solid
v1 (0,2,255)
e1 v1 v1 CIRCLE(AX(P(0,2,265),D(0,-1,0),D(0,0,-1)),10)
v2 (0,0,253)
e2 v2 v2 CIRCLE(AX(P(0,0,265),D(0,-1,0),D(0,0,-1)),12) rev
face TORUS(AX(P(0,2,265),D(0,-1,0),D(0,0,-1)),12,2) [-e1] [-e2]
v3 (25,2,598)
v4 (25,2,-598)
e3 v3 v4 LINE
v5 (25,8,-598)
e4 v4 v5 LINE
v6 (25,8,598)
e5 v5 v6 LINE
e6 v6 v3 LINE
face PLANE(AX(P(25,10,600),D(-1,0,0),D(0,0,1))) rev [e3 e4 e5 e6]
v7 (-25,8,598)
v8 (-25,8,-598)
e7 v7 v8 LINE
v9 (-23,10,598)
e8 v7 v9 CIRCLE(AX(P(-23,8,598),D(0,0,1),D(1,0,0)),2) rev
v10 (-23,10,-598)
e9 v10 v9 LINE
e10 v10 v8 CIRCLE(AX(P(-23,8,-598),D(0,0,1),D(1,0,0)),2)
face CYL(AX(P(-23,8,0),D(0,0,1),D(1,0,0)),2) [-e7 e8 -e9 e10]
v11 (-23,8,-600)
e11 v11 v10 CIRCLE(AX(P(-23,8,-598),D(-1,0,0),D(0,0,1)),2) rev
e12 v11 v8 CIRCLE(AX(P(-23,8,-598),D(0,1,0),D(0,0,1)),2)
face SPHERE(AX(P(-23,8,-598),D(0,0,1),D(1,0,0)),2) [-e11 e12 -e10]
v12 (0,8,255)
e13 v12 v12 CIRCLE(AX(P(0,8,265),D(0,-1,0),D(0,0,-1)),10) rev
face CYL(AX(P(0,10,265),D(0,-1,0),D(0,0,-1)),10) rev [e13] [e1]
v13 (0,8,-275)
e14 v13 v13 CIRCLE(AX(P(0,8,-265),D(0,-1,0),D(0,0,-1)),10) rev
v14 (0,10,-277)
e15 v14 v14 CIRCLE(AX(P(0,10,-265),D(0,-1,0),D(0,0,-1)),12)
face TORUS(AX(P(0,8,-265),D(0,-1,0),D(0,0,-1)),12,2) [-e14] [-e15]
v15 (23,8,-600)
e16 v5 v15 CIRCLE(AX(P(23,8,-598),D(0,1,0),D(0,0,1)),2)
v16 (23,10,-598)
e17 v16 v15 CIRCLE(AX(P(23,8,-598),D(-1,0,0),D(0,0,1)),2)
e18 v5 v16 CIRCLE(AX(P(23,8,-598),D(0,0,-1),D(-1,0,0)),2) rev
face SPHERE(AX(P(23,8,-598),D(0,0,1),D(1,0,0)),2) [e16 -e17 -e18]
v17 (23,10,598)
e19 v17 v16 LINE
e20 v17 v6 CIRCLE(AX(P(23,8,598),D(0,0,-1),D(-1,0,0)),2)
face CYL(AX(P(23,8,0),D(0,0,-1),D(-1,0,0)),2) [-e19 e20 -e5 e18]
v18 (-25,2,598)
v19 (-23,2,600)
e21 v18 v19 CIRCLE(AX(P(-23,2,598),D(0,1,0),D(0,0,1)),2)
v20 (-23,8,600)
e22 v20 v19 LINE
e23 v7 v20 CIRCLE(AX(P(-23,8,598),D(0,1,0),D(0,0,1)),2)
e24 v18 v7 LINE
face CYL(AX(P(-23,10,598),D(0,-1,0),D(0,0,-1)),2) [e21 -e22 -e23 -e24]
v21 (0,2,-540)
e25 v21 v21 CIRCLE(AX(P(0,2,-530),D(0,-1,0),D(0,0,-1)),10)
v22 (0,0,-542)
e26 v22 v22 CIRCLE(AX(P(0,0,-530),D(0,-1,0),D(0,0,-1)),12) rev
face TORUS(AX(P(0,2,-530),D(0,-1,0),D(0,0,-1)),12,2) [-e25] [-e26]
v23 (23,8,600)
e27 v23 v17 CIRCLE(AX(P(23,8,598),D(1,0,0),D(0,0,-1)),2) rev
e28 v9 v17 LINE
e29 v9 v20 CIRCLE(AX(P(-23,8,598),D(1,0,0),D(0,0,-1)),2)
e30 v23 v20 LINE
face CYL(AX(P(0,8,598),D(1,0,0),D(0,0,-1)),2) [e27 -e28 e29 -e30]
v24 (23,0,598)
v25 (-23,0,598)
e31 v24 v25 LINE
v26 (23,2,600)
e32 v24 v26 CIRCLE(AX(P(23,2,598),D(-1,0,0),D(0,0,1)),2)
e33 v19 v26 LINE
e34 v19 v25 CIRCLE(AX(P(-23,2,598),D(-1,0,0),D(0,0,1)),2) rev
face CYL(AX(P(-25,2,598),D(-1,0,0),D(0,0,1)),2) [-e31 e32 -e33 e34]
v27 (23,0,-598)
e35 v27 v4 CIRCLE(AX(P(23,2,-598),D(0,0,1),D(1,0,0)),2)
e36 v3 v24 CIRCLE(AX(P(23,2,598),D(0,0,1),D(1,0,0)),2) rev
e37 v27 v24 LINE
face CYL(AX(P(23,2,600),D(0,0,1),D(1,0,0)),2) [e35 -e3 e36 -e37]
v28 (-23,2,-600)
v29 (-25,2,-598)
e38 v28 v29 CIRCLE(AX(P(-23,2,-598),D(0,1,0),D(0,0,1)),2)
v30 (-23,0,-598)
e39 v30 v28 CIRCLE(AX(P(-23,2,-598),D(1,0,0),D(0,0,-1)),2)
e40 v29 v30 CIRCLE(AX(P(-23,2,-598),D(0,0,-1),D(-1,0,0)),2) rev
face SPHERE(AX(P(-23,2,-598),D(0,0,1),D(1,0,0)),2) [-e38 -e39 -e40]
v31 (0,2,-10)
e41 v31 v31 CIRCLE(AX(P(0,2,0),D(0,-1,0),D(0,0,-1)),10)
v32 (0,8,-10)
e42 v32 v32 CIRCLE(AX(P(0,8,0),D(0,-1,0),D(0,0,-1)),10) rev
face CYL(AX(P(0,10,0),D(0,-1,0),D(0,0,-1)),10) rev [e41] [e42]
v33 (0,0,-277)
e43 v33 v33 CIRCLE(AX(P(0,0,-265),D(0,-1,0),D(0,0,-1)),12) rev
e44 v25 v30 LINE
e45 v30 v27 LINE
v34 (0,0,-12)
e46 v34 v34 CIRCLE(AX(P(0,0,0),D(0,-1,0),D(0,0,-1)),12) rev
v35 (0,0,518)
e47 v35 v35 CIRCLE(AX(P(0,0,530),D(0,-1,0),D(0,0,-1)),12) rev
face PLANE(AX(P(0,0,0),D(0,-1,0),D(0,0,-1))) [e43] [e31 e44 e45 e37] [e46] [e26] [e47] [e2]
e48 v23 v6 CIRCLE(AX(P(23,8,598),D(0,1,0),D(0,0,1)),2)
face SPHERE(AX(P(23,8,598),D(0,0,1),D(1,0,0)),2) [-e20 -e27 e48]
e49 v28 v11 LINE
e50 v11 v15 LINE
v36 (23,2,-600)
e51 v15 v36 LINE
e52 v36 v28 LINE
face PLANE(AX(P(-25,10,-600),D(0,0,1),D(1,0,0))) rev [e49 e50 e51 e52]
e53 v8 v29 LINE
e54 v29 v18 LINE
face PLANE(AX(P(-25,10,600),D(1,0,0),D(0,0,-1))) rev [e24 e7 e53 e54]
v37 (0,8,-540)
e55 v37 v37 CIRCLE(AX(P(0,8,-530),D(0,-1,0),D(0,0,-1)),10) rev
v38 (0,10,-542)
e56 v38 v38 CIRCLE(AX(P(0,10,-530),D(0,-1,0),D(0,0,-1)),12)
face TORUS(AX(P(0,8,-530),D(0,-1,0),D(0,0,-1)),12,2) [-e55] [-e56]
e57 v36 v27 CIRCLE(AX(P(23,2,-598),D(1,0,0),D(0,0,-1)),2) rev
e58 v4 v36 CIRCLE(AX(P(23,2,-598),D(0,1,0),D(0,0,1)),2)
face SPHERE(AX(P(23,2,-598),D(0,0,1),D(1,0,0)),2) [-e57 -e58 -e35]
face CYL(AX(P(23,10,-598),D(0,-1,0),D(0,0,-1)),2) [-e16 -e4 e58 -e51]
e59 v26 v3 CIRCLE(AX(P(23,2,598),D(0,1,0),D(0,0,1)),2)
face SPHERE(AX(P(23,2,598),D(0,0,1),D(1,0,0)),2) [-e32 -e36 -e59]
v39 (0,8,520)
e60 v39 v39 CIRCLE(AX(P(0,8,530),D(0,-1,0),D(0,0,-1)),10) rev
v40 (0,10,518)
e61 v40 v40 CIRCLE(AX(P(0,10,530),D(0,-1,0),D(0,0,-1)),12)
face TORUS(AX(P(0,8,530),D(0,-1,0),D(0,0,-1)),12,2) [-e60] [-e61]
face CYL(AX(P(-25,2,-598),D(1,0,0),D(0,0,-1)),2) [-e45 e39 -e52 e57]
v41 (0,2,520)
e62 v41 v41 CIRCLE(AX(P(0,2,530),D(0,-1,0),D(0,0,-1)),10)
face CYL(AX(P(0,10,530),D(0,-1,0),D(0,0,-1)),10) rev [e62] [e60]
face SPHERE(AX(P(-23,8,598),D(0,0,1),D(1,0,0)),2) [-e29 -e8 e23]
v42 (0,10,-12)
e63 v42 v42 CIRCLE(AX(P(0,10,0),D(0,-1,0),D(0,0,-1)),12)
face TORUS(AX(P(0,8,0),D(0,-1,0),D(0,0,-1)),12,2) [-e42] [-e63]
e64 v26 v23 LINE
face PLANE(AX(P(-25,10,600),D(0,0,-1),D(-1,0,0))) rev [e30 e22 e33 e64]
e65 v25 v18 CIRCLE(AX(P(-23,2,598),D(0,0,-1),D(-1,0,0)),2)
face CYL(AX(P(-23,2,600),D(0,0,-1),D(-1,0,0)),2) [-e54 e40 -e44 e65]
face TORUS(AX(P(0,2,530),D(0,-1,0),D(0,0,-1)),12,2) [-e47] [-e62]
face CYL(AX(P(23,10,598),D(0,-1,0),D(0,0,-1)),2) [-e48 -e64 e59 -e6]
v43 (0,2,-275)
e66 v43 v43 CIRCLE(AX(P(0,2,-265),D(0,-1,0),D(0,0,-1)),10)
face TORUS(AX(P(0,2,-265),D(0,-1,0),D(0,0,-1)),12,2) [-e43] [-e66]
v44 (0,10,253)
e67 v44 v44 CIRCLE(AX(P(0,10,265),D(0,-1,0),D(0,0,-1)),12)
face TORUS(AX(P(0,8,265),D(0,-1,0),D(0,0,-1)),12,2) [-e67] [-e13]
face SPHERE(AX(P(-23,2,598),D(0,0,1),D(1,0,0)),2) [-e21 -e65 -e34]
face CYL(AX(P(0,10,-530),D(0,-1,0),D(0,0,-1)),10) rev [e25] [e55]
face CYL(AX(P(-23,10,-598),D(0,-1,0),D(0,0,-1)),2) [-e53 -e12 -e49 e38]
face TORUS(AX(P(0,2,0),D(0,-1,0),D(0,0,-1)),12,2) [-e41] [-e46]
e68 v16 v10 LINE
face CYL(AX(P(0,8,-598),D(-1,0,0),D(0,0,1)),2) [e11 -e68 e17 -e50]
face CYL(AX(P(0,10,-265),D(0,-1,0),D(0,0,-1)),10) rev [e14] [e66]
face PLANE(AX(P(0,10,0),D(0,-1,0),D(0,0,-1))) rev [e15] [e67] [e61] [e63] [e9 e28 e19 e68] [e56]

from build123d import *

# Parameters (mm, degrees)
CROQUIS1_W              = 50
CROQUIS1_H              = 1200
CROQUIS1_R              = 10
SALIENTE_EXTRUIR1_DEPTH = 10
REDONDEO1_R             = 2
REDONDEO2_R             = 2


with BuildPart() as part:
    # Croquis1 → Saliente-Extruir1 (new body)
    with BuildSketch(Plane(origin=(0, 0, 0), x_dir=(1, 0, 0), z_dir=(0, 1, 0))):
        Rectangle(CROQUIS1_W, CROQUIS1_H)
        with Locations(Location((0, 0, 0), (0, 0, 270))):
            Circle(CROQUIS1_R, mode=Mode.SUBTRACT)
        with Locations(Location((0, 265, 0), (0, 0, 270))):
            Circle(CROQUIS1_R, mode=Mode.SUBTRACT)
        with Locations(Location((0, 530, 0), (0, 0, 270))):
            Circle(CROQUIS1_R, mode=Mode.SUBTRACT)
        with Locations(Location((0, -530, 0), (0, 0, 270))):
            Circle(CROQUIS1_R, mode=Mode.SUBTRACT)
        with Locations(Location((0, -265, 0), (0, 0, 270))):
            Circle(CROQUIS1_R, mode=Mode.SUBTRACT)
    extrude(amount=SALIENTE_EXTRUIR1_DEPTH)

    # Redondeo1
    redondeo1_edges = [part.edges().sort_by_distance(p)[0] for p in [
        (0, 0, -275),
        (0, 10, -275),
        (-25, 10, 0),
        (0, 0, -10),
        (0, 10, -10),
        (0, 10, 600),
        (0, 0, -540),
        (0, 10, -540),
        (0, 0, 255),
        (0, 10, 255),
        (0, 0, 520),
        (0, 10, 520),
        (25, 10, 0),
        (0, 0, 600),
        (-25, 0, 0),
        (0, 0, -600),
        (25, 0, 0),
        (0, 10, -600),
    ]]
    fillet(redondeo1_edges, radius=REDONDEO1_R)

    # Redondeo2
    # the kernel refuses this fillet: 2 mm, written as the material it takes off along each edge
    with BuildSketch(Plane(origin=(-23, 8, -598), x_dir=(0, 0, -1), z_dir=(-1, 0, 0))) as redondeo2_piece_1_section:
        Polygon((0, 0), (REDONDEO2_R, 0), (REDONDEO2_R, -REDONDEO2_R), (0, -REDONDEO2_R), align=None)
    redondeo2_piece_1 = extrude(amount=REDONDEO2_R, mode=Mode.PRIVATE)
    redondeo2_piece_1 = redondeo2_piece_1 - Plane(origin=(-23, 8, -598), x_dir=(0, -0.7071067811865475, 0.7071067811865475), z_dir=(-1, 0, 0)) * Sphere(REDONDEO2_R, mode=Mode.PRIVATE)
    add(redondeo2_piece_1, mode=Mode.SUBTRACT)
    with BuildSketch(Plane(origin=(23, 8, -598), x_dir=(0, 0, -1), z_dir=(1, 0, 0))) as redondeo2_piece_2_section:
        Polygon((0, 0), (REDONDEO2_R, 0), (REDONDEO2_R, REDONDEO2_R), (0, REDONDEO2_R), align=None)
    redondeo2_piece_2 = extrude(amount=REDONDEO2_R, mode=Mode.PRIVATE)
    redondeo2_piece_2 = redondeo2_piece_2 - Plane(origin=(23, 8, -598), x_dir=(0, -0.7071067811865475, 0.7071067811865475), z_dir=(1, 0, 0)) * Sphere(REDONDEO2_R, mode=Mode.PRIVATE)
    add(redondeo2_piece_2, mode=Mode.SUBTRACT)
    with BuildSketch(Plane(origin=(-23, 8, 598), x_dir=(-1, 0, 0), z_dir=(0, 0, 1))) as redondeo2_piece_3_section:
        Polygon((0, 0), (REDONDEO2_R, 0), (REDONDEO2_R, -REDONDEO2_R), (0, -REDONDEO2_R), align=None)
    redondeo2_piece_3 = extrude(amount=REDONDEO2_R, mode=Mode.PRIVATE)
    redondeo2_piece_3 = redondeo2_piece_3 - Plane(origin=(-23, 8, 598), x_dir=(0.7071067811865475, -0.7071067811865475, 0), z_dir=(0, 0, 1)) * Sphere(REDONDEO2_R, mode=Mode.PRIVATE)
    add(redondeo2_piece_3, mode=Mode.SUBTRACT)
    with BuildSketch(Plane(origin=(23, 8, 598), x_dir=(1, 0, 0), z_dir=(0, 0, 1))) as redondeo2_piece_4_section:
        Polygon((0, 0), (REDONDEO2_R, 0), (REDONDEO2_R, REDONDEO2_R), (0, REDONDEO2_R), align=None)
    redondeo2_piece_4 = extrude(amount=REDONDEO2_R, mode=Mode.PRIVATE)
    redondeo2_piece_4 = redondeo2_piece_4 - Plane(origin=(23, 8, 598), x_dir=(-0.7071067811865475, -0.7071067811865475, 0), z_dir=(0, 0, 1)) * Sphere(REDONDEO2_R, mode=Mode.PRIVATE)
    add(redondeo2_piece_4, mode=Mode.SUBTRACT)
    with BuildSketch(Plane(origin=(23, 2, 598), x_dir=(1, 0, 0), z_dir=(0, 0, 1))) as redondeo2_piece_5_section:
        Polygon((0, 0), (REDONDEO2_R, 0), (REDONDEO2_R, -REDONDEO2_R), (0, -REDONDEO2_R), align=None)
    redondeo2_piece_5 = extrude(amount=REDONDEO2_R, mode=Mode.PRIVATE)
    redondeo2_piece_5 = redondeo2_piece_5 - Plane(origin=(23, 2, 598), x_dir=(-0.7071067811865475, 0.7071067811865475, 0), z_dir=(0, 0, 1)) * Sphere(REDONDEO2_R, mode=Mode.PRIVATE)
    add(redondeo2_piece_5, mode=Mode.SUBTRACT)
    with BuildSketch(Plane(origin=(-23, 2, 598), x_dir=(-1, 0, 0), z_dir=(0, 0, 1))) as redondeo2_piece_6_section:
        Polygon((0, 0), (REDONDEO2_R, 0), (REDONDEO2_R, REDONDEO2_R), (0, REDONDEO2_R), align=None)
    redondeo2_piece_6 = extrude(amount=REDONDEO2_R, mode=Mode.PRIVATE)
    redondeo2_piece_6 = redondeo2_piece_6 - Plane(origin=(-23, 2, 598), x_dir=(0.7071067811865475, 0.7071067811865475, 0), z_dir=(0, 0, 1)) * Sphere(REDONDEO2_R, mode=Mode.PRIVATE)
    add(redondeo2_piece_6, mode=Mode.SUBTRACT)
    with BuildSketch(Plane(origin=(23, 2, -598), x_dir=(0, 0, -1), z_dir=(1, 0, 0))) as redondeo2_piece_7_section:
        Polygon((0, 0), (REDONDEO2_R, 0), (REDONDEO2_R, -REDONDEO2_R), (0, -REDONDEO2_R), align=None)
    redondeo2_piece_7 = extrude(amount=REDONDEO2_R, mode=Mode.PRIVATE)
    redondeo2_piece_7 = redondeo2_piece_7 - Plane(origin=(23, 2, -598), x_dir=(0, 0.7071067811865475, 0.7071067811865475), z_dir=(1, 0, 0)) * Sphere(REDONDEO2_R, mode=Mode.PRIVATE)
    add(redondeo2_piece_7, mode=Mode.SUBTRACT)
    with BuildSketch(Plane(origin=(-23, 2, -598), x_dir=(0, 0, -1), z_dir=(-1, 0, 0))) as redondeo2_piece_8_section:
        Polygon((0, 0), (REDONDEO2_R, 0), (REDONDEO2_R, REDONDEO2_R), (0, REDONDEO2_R), align=None)
    redondeo2_piece_8 = extrude(amount=REDONDEO2_R, mode=Mode.PRIVATE)
    redondeo2_piece_8 = redondeo2_piece_8 - Plane(origin=(-23, 2, -598), x_dir=(0, 0.7071067811865475, 0.7071067811865475), z_dir=(-1, 0, 0)) * Sphere(REDONDEO2_R, mode=Mode.PRIVATE)
    add(redondeo2_piece_8, mode=Mode.SUBTRACT)
    with BuildSketch(Plane(origin=(25, 2, 600), x_dir=(-1, 0, 0), z_dir=(0, 1, 0)), Plane(origin=(25, 2, -600), x_dir=(0, 0, 1), z_dir=(0, 1, 0))) as redondeo2_piece_9:
        with BuildLine():
            CenterArc((REDONDEO2_R, -REDONDEO2_R), REDONDEO2_R, 90, 90)
            Line((0, -REDONDEO2_R), (0, 0))
            Line((0, 0), (REDONDEO2_R, 0))
        make_face()
    extrude(amount=6, mode=Mode.SUBTRACT)
    with BuildSketch(Plane(origin=(-25, 2, 600), x_dir=(1, 0, 0), z_dir=(0, 1, 0)), Plane(origin=(-25, 2, -600), x_dir=(0, 0, 1), z_dir=(0, 1, 0))) as redondeo2_piece_10:
        with BuildLine():
            CenterArc((REDONDEO2_R, REDONDEO2_R), REDONDEO2_R, 180, 90)
            Line((0, REDONDEO2_R), (0, 0))
            Line((0, 0), (REDONDEO2_R, 0))
        make_face()
    extrude(amount=6, mode=Mode.SUBTRACT)


solid = part.part
